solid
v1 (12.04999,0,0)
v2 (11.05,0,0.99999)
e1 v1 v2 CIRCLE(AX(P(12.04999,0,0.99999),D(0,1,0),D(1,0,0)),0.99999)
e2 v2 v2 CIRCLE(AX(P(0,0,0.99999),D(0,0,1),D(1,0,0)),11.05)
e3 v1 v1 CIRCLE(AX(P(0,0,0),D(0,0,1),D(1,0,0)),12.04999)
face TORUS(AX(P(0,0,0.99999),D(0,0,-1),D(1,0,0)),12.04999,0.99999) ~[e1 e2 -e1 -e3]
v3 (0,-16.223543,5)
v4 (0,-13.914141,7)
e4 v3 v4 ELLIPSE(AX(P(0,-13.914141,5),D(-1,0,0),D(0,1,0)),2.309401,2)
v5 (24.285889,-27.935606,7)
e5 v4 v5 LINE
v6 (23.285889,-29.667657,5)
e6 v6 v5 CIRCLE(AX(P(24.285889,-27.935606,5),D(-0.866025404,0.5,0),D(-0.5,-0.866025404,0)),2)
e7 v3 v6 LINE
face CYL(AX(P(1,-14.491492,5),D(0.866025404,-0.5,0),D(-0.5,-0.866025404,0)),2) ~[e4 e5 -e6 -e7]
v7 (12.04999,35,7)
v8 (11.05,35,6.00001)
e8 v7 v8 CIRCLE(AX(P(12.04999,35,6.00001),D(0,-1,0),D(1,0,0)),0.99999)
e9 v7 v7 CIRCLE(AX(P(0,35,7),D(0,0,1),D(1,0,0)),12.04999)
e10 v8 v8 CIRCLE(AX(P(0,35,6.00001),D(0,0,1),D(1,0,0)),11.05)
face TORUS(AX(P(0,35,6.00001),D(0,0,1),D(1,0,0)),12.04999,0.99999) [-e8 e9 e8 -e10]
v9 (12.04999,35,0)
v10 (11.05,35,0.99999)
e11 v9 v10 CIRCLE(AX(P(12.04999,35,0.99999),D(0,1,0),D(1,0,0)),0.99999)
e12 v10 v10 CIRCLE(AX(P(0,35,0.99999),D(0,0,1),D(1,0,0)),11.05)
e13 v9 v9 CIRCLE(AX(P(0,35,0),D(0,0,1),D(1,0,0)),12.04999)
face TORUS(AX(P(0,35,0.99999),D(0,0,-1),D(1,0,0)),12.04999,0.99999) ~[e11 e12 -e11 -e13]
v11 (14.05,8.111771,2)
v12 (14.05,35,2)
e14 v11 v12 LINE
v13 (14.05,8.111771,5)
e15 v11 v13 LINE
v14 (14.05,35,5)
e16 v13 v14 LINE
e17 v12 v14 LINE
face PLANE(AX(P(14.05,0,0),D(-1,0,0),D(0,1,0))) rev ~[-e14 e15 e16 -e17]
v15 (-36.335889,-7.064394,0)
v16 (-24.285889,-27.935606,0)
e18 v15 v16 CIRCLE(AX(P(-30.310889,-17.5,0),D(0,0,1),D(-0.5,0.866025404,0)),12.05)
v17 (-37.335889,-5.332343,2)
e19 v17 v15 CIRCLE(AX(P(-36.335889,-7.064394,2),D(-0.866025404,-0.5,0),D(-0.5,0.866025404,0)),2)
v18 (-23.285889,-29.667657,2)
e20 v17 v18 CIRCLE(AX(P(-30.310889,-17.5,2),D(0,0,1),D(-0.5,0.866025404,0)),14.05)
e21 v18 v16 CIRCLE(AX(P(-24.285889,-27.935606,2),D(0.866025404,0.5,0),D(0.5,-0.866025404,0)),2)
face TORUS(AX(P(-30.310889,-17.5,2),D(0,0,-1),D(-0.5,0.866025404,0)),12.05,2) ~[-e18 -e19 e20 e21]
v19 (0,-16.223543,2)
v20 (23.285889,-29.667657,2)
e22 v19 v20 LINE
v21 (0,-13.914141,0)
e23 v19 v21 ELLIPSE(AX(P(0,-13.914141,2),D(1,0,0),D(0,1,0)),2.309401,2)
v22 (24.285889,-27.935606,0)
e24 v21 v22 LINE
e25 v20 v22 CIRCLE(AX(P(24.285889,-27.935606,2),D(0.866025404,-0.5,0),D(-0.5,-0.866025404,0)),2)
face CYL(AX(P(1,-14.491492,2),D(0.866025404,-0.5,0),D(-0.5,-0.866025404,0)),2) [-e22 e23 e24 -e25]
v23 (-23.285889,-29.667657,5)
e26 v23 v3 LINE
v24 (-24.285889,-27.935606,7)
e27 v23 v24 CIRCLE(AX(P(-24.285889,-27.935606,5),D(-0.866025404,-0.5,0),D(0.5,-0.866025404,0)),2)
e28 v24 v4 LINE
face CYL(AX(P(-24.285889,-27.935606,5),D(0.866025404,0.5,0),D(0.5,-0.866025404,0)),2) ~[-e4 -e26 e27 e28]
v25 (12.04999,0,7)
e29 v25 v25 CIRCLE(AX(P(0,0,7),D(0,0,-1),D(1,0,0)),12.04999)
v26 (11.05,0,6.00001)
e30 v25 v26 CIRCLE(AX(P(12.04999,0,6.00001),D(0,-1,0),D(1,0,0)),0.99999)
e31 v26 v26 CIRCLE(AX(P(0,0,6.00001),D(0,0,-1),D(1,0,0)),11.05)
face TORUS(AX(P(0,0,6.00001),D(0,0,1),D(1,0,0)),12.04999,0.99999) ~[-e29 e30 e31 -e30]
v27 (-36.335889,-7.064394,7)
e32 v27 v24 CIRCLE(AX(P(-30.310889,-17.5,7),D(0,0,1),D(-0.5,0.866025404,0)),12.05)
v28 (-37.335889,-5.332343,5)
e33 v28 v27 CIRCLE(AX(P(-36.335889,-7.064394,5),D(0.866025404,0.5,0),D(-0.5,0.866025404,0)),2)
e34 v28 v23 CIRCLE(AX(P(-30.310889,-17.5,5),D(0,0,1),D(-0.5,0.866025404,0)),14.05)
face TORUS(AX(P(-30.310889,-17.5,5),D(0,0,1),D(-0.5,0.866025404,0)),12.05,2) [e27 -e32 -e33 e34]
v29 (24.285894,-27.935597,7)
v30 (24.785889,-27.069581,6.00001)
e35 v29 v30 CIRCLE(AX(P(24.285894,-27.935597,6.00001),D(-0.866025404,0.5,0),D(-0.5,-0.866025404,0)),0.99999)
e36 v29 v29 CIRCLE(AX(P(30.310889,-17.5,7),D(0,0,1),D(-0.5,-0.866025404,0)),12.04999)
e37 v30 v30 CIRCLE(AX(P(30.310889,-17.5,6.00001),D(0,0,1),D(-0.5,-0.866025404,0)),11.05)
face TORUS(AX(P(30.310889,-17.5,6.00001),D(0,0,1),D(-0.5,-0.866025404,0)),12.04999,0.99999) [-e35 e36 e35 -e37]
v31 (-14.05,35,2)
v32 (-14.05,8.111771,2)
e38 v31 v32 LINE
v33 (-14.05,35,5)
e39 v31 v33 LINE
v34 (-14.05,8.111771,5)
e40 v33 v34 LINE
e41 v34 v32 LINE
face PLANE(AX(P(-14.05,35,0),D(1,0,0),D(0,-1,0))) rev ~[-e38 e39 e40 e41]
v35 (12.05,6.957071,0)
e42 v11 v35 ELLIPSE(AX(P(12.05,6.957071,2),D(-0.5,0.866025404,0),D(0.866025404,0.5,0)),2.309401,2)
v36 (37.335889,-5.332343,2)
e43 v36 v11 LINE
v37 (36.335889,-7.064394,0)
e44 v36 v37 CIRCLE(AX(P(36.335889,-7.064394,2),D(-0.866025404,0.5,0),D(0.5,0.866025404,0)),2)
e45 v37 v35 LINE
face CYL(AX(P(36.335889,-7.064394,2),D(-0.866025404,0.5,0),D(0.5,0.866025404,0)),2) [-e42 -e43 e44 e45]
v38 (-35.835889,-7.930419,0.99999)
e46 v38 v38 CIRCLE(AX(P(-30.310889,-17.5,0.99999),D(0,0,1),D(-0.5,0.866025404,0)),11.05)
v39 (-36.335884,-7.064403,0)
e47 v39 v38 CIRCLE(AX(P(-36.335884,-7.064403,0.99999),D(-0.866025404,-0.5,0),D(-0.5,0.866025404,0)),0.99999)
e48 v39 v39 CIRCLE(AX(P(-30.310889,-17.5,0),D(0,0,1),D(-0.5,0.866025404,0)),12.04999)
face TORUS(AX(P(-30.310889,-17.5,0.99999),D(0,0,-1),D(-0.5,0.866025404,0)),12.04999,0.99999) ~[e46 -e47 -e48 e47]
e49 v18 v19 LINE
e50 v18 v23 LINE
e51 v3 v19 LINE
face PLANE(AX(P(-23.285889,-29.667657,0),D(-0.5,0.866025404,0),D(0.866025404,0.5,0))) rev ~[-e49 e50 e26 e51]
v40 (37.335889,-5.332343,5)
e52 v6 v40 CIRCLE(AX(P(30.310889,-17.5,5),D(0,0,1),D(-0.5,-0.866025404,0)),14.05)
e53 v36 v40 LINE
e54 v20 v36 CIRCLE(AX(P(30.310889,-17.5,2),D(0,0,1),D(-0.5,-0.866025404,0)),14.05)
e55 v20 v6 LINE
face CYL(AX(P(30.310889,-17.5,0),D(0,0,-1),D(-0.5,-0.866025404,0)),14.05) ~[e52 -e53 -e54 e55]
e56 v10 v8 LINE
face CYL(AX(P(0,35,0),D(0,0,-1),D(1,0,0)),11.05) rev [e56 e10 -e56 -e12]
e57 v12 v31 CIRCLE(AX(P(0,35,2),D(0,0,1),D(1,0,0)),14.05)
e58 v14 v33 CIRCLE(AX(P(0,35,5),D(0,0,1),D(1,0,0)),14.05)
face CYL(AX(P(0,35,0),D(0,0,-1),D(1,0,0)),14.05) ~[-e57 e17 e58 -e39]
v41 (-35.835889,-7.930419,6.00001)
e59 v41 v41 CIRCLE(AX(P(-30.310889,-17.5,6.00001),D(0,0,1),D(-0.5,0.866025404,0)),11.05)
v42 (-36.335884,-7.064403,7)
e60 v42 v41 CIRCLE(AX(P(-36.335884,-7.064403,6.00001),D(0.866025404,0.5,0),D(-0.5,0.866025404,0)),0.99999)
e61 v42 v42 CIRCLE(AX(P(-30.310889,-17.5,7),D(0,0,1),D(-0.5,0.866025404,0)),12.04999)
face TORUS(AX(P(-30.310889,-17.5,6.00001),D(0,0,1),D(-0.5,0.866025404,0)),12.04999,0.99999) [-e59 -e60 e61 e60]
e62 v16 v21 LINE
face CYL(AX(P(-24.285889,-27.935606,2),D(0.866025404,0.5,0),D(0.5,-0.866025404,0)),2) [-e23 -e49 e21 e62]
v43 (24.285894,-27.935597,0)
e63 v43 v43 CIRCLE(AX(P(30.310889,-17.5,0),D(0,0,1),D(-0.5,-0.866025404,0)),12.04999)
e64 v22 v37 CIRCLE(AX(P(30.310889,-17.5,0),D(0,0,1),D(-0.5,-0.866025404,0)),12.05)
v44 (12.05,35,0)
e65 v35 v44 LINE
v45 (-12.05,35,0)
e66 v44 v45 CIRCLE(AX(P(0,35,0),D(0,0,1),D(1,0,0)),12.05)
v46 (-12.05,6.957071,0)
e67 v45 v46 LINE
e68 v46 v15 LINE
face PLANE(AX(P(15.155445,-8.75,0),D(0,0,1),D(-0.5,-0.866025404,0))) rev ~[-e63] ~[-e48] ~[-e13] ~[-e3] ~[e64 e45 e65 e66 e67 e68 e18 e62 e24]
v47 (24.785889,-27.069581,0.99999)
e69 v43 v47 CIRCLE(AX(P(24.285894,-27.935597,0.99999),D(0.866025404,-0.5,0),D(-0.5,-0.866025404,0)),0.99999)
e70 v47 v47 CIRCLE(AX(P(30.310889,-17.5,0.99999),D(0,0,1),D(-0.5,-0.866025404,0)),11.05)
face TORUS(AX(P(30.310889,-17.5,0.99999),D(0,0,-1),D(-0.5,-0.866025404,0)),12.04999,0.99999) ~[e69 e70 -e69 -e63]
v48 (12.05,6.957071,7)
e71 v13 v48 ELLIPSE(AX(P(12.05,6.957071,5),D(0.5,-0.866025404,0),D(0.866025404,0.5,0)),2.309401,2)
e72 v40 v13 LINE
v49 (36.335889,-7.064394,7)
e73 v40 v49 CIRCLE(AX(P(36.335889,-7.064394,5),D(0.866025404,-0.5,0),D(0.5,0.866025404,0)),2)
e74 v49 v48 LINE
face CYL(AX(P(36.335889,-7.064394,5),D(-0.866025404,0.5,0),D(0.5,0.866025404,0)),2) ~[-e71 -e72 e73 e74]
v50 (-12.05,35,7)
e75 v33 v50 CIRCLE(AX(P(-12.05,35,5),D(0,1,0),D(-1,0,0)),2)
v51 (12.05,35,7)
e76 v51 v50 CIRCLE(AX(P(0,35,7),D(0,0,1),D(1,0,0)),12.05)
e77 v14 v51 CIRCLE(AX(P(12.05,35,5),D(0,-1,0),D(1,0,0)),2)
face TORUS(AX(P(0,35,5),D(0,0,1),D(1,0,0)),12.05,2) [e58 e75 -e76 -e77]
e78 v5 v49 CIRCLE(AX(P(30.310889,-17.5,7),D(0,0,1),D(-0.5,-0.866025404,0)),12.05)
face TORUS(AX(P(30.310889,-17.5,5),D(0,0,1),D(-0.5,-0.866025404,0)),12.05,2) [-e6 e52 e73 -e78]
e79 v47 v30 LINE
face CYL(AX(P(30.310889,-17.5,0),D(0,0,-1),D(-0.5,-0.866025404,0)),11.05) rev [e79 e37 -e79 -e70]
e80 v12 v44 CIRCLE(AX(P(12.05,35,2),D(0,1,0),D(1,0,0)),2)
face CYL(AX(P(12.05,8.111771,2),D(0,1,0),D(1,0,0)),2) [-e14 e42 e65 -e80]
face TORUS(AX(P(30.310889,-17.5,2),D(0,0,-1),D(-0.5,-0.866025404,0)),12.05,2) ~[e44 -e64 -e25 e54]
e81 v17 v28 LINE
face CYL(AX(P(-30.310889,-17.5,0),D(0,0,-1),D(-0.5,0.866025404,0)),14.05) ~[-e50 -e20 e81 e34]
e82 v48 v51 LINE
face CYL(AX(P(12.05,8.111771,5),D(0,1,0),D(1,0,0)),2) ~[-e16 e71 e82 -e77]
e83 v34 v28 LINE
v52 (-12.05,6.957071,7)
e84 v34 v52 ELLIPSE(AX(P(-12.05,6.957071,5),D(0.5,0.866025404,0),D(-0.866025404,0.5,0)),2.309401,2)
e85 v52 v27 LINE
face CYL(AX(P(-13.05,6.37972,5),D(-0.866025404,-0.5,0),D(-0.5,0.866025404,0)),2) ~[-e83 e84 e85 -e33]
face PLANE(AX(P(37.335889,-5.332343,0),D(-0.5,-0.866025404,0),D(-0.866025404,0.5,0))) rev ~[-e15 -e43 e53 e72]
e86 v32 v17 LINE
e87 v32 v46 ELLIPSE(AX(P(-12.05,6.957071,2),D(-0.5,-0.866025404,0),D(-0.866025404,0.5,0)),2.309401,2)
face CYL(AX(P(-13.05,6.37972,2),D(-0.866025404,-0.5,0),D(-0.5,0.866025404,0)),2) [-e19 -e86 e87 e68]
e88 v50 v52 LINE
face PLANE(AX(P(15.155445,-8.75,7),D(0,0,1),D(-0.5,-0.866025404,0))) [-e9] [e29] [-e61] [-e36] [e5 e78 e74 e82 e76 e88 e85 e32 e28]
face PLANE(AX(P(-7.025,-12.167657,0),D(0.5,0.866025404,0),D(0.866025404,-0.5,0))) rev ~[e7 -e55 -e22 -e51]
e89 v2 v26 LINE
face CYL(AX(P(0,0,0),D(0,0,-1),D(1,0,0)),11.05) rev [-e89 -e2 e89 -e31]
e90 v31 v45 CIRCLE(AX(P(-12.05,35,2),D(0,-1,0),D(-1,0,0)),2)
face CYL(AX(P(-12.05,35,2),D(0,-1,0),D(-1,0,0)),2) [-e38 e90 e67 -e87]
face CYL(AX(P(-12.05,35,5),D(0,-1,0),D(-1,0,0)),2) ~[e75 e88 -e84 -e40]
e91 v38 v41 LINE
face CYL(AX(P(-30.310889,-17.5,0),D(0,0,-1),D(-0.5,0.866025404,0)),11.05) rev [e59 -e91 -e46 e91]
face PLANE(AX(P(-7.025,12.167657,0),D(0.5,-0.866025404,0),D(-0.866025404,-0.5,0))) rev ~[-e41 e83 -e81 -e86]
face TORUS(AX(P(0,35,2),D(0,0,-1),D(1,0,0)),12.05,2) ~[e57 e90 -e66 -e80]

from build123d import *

# Parameters (mm, degrees)
F0_R     = 11.05
F1_DEPTH = 7
F2_COUNT = 3
F3_R     = 2
F4_R     = 0.99999


# Not quite as in the source:
# - a fillet or chamfer is up to 0.001 mm smaller than in the source, because OpenCascade refuses the exact size


with BuildPart() as f1:
    # F0 (on Top) → F1 (new body)
    with BuildSketch(Plane.XY):
        with BuildLine():
            Line((-14.05, 35), (-14.05, 0))
            ThreePointArc((-14.05, 0), (0, -14.05), (14.05, 0))
            Line((14.05, 0), (14.05, 35))
            ThreePointArc((14.05, 35), (0, 49.05), (-14.05, 35))
        make_face()
        Circle(F0_R, mode=Mode.SUBTRACT)
        with Locations((0, 35)):
            Circle(F0_R, mode=Mode.SUBTRACT)
    extrude(amount=F1_DEPTH)

    # F2: F1 ×3 about axis
    f2_axis = Axis((0, 0, 7), (0, 0, 1))


with BuildPart() as f1_1:
    add(f1.part)
    for i in range(1, F2_COUNT):
        add(f1.part.rotate(f2_axis, i * 360 / F2_COUNT))

    # F3
    f3_edges = [f1_1.edges().sort_by_distance(p)[0] for p in [
        (-25.692945, 1.389714, 0),
        (-14.05, 21.555886, 0),
        (25.692945, 1.389714, 0),
        (-25.692945, 1.389714, 7),
        (-14.05, 21.555886, 7),
        (11.642945, -22.9456, 7),
    ]]
    fillet(f3_edges, radius=F3_R)

    # F4 (radius 1 in the source; OpenCascade refuses exactly that, so slightly less here)
    f4_edges = [f1_1.edges().sort_by_distance(p)[0] for p in [
        (-24.785889, -27.069581, 0),
        (-24.785889, -27.069581, 7),
        (-11.05, 0, 0),
        (-11.05, 0, 7),
        (-11.05, 35, 0),
        (-11.05, 35, 7),
        (35.835889, -7.930419, 0),
        (35.835889, -7.930419, 7),
    ]]
    fillet(f4_edges, radius=F4_R)


solid = f1_1.part
